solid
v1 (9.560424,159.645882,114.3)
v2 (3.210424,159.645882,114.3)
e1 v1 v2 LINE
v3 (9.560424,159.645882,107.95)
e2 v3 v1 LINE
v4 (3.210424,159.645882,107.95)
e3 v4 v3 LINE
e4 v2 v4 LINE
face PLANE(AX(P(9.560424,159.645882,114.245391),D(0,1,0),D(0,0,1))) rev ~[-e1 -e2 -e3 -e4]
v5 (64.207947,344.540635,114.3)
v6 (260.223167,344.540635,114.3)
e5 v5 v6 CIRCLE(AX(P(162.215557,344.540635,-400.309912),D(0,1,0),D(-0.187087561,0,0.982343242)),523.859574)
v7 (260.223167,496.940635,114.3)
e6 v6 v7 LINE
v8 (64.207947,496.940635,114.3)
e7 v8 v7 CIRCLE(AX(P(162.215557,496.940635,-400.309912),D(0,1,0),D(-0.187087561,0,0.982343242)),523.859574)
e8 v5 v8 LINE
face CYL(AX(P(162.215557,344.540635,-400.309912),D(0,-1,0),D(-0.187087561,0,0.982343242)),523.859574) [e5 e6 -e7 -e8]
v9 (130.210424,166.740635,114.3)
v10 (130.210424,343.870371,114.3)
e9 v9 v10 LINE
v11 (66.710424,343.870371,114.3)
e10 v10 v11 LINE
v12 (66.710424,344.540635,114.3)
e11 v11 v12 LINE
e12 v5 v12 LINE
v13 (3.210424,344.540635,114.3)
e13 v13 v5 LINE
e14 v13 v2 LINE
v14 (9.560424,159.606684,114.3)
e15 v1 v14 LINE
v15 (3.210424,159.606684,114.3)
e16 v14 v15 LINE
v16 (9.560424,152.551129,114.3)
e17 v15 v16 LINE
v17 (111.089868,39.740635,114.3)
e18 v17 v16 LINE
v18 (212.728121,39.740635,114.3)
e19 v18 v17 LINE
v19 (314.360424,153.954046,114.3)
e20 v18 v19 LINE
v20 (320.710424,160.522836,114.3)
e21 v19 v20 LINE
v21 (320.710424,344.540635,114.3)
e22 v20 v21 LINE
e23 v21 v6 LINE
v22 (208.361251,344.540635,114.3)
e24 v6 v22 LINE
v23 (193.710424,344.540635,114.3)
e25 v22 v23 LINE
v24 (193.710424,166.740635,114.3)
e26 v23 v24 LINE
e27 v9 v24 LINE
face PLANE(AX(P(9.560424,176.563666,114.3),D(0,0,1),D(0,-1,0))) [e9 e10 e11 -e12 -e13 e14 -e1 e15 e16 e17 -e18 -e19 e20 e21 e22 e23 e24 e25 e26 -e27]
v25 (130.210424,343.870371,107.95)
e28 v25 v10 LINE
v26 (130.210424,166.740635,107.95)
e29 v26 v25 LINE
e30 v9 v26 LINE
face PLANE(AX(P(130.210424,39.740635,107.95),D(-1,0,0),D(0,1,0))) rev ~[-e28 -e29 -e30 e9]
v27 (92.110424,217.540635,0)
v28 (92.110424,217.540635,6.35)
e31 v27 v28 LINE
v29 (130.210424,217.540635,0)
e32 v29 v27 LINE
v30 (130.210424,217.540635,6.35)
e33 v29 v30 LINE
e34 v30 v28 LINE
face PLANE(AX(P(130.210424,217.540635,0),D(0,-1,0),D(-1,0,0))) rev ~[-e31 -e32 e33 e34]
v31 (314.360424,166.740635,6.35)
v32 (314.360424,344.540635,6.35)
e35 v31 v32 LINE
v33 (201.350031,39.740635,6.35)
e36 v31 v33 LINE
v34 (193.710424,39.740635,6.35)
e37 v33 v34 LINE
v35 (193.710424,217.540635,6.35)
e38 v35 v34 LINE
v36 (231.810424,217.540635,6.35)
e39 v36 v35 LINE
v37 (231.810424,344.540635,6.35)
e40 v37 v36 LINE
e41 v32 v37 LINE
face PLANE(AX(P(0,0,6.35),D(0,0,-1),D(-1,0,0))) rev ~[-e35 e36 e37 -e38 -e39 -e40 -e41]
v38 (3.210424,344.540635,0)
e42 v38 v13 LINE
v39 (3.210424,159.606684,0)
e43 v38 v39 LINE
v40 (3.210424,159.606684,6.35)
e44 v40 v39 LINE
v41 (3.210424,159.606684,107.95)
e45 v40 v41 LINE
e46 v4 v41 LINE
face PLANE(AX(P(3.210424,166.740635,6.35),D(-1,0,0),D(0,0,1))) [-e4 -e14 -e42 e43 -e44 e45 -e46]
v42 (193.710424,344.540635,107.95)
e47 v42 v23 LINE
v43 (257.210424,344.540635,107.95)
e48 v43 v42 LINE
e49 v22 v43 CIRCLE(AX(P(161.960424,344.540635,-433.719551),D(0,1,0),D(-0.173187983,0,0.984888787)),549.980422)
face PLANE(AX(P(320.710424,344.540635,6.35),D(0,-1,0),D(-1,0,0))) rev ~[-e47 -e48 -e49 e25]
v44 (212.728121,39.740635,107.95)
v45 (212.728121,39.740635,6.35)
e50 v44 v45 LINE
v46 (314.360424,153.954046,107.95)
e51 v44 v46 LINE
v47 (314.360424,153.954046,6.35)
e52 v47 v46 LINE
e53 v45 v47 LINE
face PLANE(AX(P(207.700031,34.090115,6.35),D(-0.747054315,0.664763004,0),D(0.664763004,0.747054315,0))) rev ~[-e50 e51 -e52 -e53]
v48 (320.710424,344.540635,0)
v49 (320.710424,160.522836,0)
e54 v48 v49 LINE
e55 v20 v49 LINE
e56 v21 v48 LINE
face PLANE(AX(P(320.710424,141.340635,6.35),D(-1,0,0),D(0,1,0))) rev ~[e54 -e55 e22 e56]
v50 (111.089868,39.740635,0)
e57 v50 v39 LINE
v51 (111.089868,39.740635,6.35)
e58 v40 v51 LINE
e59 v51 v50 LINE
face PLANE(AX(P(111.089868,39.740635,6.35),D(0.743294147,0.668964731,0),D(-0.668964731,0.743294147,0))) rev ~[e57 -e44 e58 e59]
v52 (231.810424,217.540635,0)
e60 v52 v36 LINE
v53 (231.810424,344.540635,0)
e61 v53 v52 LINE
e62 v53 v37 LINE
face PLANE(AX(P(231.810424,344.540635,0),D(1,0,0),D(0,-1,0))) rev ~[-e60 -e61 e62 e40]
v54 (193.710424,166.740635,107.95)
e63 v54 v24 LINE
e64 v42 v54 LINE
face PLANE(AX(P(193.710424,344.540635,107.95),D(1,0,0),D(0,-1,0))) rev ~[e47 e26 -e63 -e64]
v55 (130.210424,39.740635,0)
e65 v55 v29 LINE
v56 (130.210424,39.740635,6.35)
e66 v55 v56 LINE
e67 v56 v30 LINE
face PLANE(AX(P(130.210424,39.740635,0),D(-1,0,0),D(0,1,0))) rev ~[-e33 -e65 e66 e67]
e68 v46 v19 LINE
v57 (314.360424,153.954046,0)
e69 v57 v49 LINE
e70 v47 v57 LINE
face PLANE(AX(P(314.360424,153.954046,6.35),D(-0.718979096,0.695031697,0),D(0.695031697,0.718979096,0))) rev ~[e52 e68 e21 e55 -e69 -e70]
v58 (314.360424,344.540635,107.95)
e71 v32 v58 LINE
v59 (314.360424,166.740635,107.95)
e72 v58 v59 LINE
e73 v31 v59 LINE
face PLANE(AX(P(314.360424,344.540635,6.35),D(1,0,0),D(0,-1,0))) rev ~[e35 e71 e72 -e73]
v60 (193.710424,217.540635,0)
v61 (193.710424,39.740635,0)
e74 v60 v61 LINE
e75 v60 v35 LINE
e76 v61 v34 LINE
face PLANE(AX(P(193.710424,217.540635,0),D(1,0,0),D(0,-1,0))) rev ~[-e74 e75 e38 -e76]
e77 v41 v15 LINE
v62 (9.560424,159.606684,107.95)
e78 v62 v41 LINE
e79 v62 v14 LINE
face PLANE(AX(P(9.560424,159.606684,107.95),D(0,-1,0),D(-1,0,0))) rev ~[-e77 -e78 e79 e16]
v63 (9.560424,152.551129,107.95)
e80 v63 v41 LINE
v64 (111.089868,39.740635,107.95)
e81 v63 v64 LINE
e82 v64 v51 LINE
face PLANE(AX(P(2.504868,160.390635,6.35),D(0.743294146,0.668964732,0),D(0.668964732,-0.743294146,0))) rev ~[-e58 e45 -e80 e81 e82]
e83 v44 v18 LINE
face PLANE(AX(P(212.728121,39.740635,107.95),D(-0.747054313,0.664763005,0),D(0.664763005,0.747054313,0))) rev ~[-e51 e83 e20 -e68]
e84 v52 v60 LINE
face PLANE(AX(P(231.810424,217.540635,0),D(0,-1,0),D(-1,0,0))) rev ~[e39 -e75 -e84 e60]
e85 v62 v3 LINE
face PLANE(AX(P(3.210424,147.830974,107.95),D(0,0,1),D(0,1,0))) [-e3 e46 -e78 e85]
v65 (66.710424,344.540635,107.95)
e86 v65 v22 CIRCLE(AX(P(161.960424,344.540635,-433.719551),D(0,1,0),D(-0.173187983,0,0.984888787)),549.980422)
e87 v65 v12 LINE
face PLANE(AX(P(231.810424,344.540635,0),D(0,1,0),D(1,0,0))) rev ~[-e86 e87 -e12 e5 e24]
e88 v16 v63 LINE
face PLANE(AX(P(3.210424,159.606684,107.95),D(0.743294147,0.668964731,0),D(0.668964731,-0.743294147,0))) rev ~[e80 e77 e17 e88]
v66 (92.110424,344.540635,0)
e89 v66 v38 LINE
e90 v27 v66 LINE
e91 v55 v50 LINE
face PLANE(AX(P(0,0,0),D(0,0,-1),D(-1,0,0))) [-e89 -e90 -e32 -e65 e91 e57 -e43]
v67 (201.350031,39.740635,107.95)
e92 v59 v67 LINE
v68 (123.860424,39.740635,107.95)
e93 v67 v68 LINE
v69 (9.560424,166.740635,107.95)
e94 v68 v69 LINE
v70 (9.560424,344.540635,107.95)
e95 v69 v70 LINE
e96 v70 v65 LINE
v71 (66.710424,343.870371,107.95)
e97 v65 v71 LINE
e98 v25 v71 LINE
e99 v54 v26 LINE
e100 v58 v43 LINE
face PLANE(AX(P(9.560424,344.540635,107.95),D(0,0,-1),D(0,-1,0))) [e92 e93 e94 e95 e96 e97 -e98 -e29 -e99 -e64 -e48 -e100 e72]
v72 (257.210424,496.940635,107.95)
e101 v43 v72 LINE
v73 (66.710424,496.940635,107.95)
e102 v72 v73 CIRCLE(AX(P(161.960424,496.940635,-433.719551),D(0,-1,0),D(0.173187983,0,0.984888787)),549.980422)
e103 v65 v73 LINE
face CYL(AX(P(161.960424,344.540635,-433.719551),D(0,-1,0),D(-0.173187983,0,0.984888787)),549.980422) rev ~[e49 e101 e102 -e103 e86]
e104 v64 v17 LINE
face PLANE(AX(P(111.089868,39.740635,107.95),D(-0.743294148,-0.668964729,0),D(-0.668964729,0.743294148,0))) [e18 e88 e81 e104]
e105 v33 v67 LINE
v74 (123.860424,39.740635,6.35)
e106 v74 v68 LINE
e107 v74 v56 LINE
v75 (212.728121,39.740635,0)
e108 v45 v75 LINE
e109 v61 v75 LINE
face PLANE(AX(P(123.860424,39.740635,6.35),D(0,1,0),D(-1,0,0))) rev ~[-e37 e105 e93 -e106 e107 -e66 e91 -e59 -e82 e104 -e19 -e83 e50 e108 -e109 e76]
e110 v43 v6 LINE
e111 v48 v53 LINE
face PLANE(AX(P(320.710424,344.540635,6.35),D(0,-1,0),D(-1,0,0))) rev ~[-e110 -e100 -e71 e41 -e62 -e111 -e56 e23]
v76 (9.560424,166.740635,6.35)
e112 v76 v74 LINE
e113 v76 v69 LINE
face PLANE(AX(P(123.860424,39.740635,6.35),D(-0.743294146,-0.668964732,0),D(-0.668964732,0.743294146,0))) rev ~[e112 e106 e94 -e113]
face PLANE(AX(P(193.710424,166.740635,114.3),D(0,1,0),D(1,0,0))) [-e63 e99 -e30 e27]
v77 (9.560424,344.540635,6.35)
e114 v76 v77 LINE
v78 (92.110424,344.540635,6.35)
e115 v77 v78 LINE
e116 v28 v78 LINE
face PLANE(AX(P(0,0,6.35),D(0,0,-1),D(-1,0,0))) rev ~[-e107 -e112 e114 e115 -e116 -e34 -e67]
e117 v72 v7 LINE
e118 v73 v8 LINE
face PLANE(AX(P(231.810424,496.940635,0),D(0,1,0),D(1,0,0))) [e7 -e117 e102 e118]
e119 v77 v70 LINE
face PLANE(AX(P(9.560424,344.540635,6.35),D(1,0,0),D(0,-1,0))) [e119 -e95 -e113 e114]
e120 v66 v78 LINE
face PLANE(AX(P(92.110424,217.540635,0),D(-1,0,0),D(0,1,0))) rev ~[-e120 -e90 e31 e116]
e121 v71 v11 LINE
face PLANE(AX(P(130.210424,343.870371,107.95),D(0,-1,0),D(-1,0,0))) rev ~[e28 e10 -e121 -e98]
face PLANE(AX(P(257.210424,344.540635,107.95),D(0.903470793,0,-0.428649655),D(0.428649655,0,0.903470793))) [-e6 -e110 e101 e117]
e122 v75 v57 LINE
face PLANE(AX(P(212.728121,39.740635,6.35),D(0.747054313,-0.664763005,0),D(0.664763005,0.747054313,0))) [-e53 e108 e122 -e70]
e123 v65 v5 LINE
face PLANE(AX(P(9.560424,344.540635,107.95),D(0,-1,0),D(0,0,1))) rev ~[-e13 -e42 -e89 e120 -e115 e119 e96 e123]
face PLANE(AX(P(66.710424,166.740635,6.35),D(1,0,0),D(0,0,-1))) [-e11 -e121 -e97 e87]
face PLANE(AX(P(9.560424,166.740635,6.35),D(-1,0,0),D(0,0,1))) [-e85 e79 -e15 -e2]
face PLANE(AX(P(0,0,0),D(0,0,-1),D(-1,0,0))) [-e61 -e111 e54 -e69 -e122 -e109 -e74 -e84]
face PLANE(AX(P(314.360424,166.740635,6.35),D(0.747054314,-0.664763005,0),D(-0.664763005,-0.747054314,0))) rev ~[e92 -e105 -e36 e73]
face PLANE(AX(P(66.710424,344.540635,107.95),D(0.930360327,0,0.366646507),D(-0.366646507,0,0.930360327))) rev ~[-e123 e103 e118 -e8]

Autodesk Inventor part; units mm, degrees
ref_plane "YZ Plane" through (0, 0, 0) normal (1, 0, 0) x (0, 1, 0)
ref_plane "XZ Plane" through (0, 0, 0) normal (0, 1, 0) x (-1, 0, 0)
ref_plane "XY Plane" through (0, 0, 0) normal (0, 0, 1) x (1, 0, 0)
sketch "Sketch1" plane through (0, 0, 0) normal (0, 0, 1) x (1, 0, 0)
  line L0 (9.560424, 344.540635) -> (9.560424, 166.740635)
  line L1 (9.560424, 166.740635) -> (123.860424, 39.740635)
  line L2 (123.860424, 39.740635) -> (130.210424, 39.740635)
  line L3 (130.210424, 39.740635) -> (130.210424, 217.540635)
  line L4 (130.210424, 217.540635) -> (92.110424, 217.540635)
  line L5 (92.110424, 217.540635) -> (92.110424, 344.540635)
  line L6 (92.110424, 344.540635) -> (9.560424, 344.540635)
  line L7 (193.710424, 217.540635) -> (193.710424, 39.740635)
  line L8 (193.710424, 39.740635) -> (200.060424, 39.740635)
  line L9 (200.060424, 39.740635) -> (314.360424, 166.740635)
  line L10 (314.360424, 166.740635) -> (314.360424, 344.540635)
  line L11 (314.360424, 344.540635) -> (231.810424, 344.540635)
  line L12 (231.810424, 344.540635) -> (231.810424, 217.540635)
  line L13 (231.810424, 217.540635) -> (193.710424, 217.540635)
  point P0 (0, 0)
  dimension "d0" = 127
  dimension "d1" = 38.1
  dimension "d2" = 177.8
  dimension "d3" = 127
  dimension "d4" = 82.55
  dimension "d5" = 6.35
  dimension "d9" = 63.5
  dimension "d10" = 38.1
  dimension "d11" = 82.55
  dimension "d12" = 6.35
  dimension "d13" = 177.8
  dimension "d14" = 170.86103
  dimension "d15" = 127
  dimension "d16" = 177.8
extrude "Extrusion1" add sketch "Sketch1" along normal blind 6.35
sketch "Sketch2" plane through (0, 0, 6.35) normal (0, 0, 1) x (1, 0, 0)
  line L0 (9.560424, 166.740635) -> (123.860424, 39.740635)
  line L1 (9.560424, 166.740635) -> (123.860424, 39.740635)
  line L2 (123.860424, 39.740635) -> (116.804868, 33.390635)
  line L3 (116.804868, 33.390635) -> (2.504868, 160.390635)
  line L4 (2.504868, 160.390635) -> (9.560424, 166.740635)
  line L5 (314.360424, 166.740635) -> (201.350031, 39.740635)
  line L6 (201.350031, 39.740635) -> (207.700031, 34.090115)
  line L7 (207.700031, 34.090115) -> (320.710424, 161.090115)
  line L8 (320.710424, 161.090115) -> (314.360424, 166.740635)
  line L9 (9.560424, 166.740635) -> (3.210424, 166.740635)
  line L10 (3.210424, 166.740635) -> (3.210424, 369.270371)
  line L11 (3.210424, 369.270371) -> (9.560424, 369.270371)
  line L12 (9.560424, 369.270371) -> (9.560424, 166.740635)
  line L13 (314.360424, 166.740635) -> (314.360424, 344.540635)
  line L14 (314.360424, 344.540635) -> (320.710424, 344.540635)
  line L15 (320.710424, 344.540635) -> (320.710424, 141.340635)
  line L16 (320.710424, 141.340635) -> (314.360424, 141.340635)
  line L17 (314.360424, 141.340635) -> (314.360424, 344.540635)
  point P0 (0, 0)
  dimension "d17" = 6.35
  dimension "d18" = 6.35
  dimension "d19" = 6.35
  dimension "d20" = 6.35
sketch "Sketch2 outline for Extrusion2" plane through (0, 0, 6.35) normal (0, 0, 1) x (1, 0, 0)
  line L0 (3.210424, 166.740635) -> (9.560424, 166.740635)
  line L1 (3.210424, 369.270371) -> (3.210424, 166.740635)
  line L2 (9.560424, 369.270371) -> (3.210424, 369.270371)
  line L3 (9.560424, 166.740635) -> (9.560424, 369.270371)
  line L4 (320.710424, 344.540635) -> (314.360424, 344.540635)
  line L5 (314.360424, 344.540635) -> (314.360424, 166.740635)
  line L6 (314.360424, 166.740635) -> (201.350031, 39.740635)
  line L7 (201.350031, 39.740635) -> (207.700031, 34.090115)
  line L8 (207.700031, 34.090115) -> (314.360424, 153.954046)
  line L9 (314.360424, 153.954046) -> (314.360424, 141.340635)
  line L10 (314.360424, 141.340635) -> (320.710424, 141.340635)
  line L11 (320.710424, 141.340635) -> (320.710424, 344.540635)
  line L12 (123.860424, 39.740635) -> (9.560424, 166.740635)
  line L13 (116.804868, 33.390635) -> (123.860424, 39.740635)
  line L14 (2.504868, 160.390635) -> (116.804868, 33.390635)
  line L15 (9.560424, 166.740635) -> (2.504868, 160.390635)
extrude "Extrusion2" add sketch "Sketch2 outline for Extrusion2" along normal blind 101.6
sketch "Sketch4" plane through (0, 0, 0) normal (0, 0, -1) x (-1, 0, 0)
  line L0 (-193.710424, 39.740635) -> (-200.060424, 39.740635)
  line L1 (-193.710424, 39.740635) -> (-216.217025, 39.740635)
  line L2 (-216.217025, 39.740635) -> (-216.217025, 32.649574)
  line L3 (-216.217025, 32.649574) -> (-193.710424, 32.649574)
  line L4 (-193.710424, 32.649574) -> (-193.710424, 39.740635)
  line L5 (-123.860424, 39.740635) -> (-130.210424, 39.740635)
  line L6 (-130.210424, 39.740635) -> (-108.923155, 39.740635)
  line L7 (-108.923155, 39.740635) -> (-108.923155, 31.510409)
  line L8 (-108.923155, 31.510409) -> (-130.210424, 31.510409)
  line L9 (-130.210424, 31.510409) -> (-130.210424, 39.740635)
  point P0 (0, 0)
  point P1 (-200.060424, 14.340635)
  point P2 (-123.860424, 14.340635)
extrude "Extrusion4" cut sketch "Sketch4" against normal blind 114.3
sketch "Sketch5" plane through (0, 0, 107.95) normal (0, 0, 1) x (1, 0, 0)
  line L0 (3.210424, 141.340635) -> (3.210424, 343.870371)
  line L1 (3.210424, 343.870371) -> (130.210424, 343.870371)
  line L2 (92.110424, 344.540635) -> (9.560424, 344.540635)
  line L3 (130.210424, 39.740635) -> (130.210424, 217.540635)
  line L4 (130.210424, 343.870371) -> (130.210424, 39.740635)
  line L5 (123.860424, 39.740635) -> (130.210424, 39.740635)
  line L6 (130.210424, 14.340635) -> (111.089868, 14.340635)
  line L7 (111.089868, 14.340635) -> (2.504868, 134.990635)
  line L8 (111.089868, 14.340635) -> (2.504868, 134.990635)
  line L9 (2.504868, 134.990635) -> (3.210424, 141.340635)
  line L10 (193.710424, 39.740635) -> (193.710424, 344.540635)
  line L11 (193.710424, 344.540635) -> (320.710424, 344.540635)
  line L12 (320.710424, 141.340635) -> (320.710424, 344.540635)
  line L13 (320.710424, 344.540635) -> (320.710424, 141.340635)
  line L14 (314.360424, 344.540635) -> (314.360424, 141.340635)
  line L15 (320.710424, 135.690115) -> (314.360424, 141.340635)
  line L16 (320.710424, 141.340635) -> (320.710424, 135.690115)
  line L17 (320.710424, 135.690115) -> (235.3302, 39.740635)
  line L18 (235.3302, 39.740635) -> (193.710424, 39.740635)
  point P0 (0, 0)
sketch "Sketch5 outline for Extrusion5" plane through (0, 0, 107.95) normal (0, 0, 1) x (1, 0, 0)
  line L0 (193.710424, 344.540635) -> (193.710424, 39.740635)
  line L1 (193.710424, 39.740635) -> (235.3302, 39.740635)
  line L2 (235.3302, 39.740635) -> (320.710424, 135.690115)
  line L3 (320.710424, 135.690115) -> (320.710424, 344.540635)
  line L4 (320.710424, 344.540635) -> (193.710424, 344.540635)
  line L5 (3.210424, 343.870371) -> (3.210424, 141.340635)
  line L6 (130.210424, 343.870371) -> (3.210424, 343.870371)
  line L7 (130.210424, 39.740635) -> (130.210424, 343.870371)
  line L8 (111.089868, 14.340635) -> (130.210424, 39.740635)
  line L9 (2.504868, 134.990635) -> (111.089868, 14.340635)
  line L10 (3.210424, 141.340635) -> (2.504868, 134.990635)
extrude "Extrusion5" add sketch "Sketch5 outline for Extrusion5" along normal blind 6.35
sketch "Sketch6" plane through (193.710424, 39.740635, 107.95) normal (-1, 0, 0) x (0, 0, 1)
  line L0 (0, 304.8) -> (0, 0) projected
  line L1 (6.35, 0) -> (-101.6, 0) projected
  line L2 (0, 101.6) -> (6.35, 101.6)
  line L3 (6.35, 101.6) -> (6.35, 0)
  line L4 (6.35, 0) -> (0, 0)
  line L5 (0, 0) -> (0, 101.6)
  point P0 (-107.95, -39.740635)
  point P1 (-107.95, 0)
  dimension "d29" = 101.6
extrude "Extrusion6" add sketch "Sketch6" along normal blind 63.5
sketch "Sketch7" plane through (0, 0, 0) normal (0, 0, -1) x (-1, 0, 0)
  line L0 (-3.210424, 343.870371) -> (-3.210424, 141.340635)
  line L1 (-3.210424, 147.802494) -> (-9.560424, 147.802494)
  line L2 (-9.560424, 147.802494) -> (-9.560424, 134.679374)
  line L3 (-9.560424, 134.679374) -> (-3.210424, 134.679374)
  line L4 (-3.210424, 134.679374) -> (-3.210424, 147.802494)
  line L5 (-314.360424, 166.740635) -> (-201.350031, 39.740635)
  line L6 (-320.714268, 135.664797) -> (-320.714268, 145.552556)
  line L7 (-320.738877, 135.664797) -> (-314.360424, 135.664797)
  line L8 (-314.360424, 135.664797) -> (-314.360424, 145.552556)
  line L9 (-314.360424, 166.740635) -> (-314.360424, 344.540635)
  line L10 (-320.714268, 145.552556) -> (-314.360424, 145.552556)
  line L11 (-320.738877, 135.664797) -> (-314.360424, 135.664797)
  line L12 (-314.360424, 135.664797) -> (-314.360424, 145.552556)
  line L13 (-314.360424, 145.552556) -> (-320.738877, 145.552556)
  line L14 (-320.738877, 145.552556) -> (-320.738877, 135.664797)
  point P0 (0, 0)
  point P1 (-309.309804, 161.064797)
  point P2 (-314.360424, 141.340635)
  point P3 (-201.350031, 39.740635)
sketch "Sketch8" plane through (0, 0, 0) normal (0, 0, -1) x (-1, 0, 0)
  line L0 (-3.210424, 141.340635) -> (-3.210424, 343.870371)
  line L1 (-3.210424, 141.825243) -> (-1.362602, 141.825243)
  line L2 (-1.362602, 141.825243) -> (-1.362602, 134.146464)
  line L3 (-1.362602, 134.146464) -> (-3.210424, 134.146464)
  line L4 (-3.210424, 134.146464) -> (-3.210424, 141.825243)
  point P0 (0, 0)
  point P1 (-3.210424, 135.625635)
extrude "Extrusion8" cut sketch "Sketch8" against normal blind 114.3
sketch "Sketch10" plane through (231.810424, 344.540635, 0) normal (0, 1, 0) x (1, 0, 0)
  line L0 (88.9, -114.3) -> (-38.1, -114.3)
  line L1 (-101.6, -114.3) -> (-228.6, -114.3)
  line L2 (-101.6, -107.95) -> (-222.25, -107.95)
  line L3 (82.55, -107.95) -> (-30.460392, -107.95)
  arc A0 (-165.1, -107.95) -> (25.4, -107.95) centre (-69.85, 433.719551) ccw
  line L4 (88.9, -6.35) -> (88.9, -114.3)
  line L5 (-228.6, -107.95) -> (-228.6, -114.3)
  line L6 (-165.1, -107.95) -> (-167.602477, -114.3)
  line L7 (25.4, -107.95) -> (28.412743, -114.3)
  line L8 (3.519776, -114.3) -> (88.9, -114.3)
  arc A1 (-167.602477, -114.3) -> (28.412743, -114.3) centre (-69.594867, 400.309912) ccw
  point P0 (-231.810424, 0)
  point P1 (-165.1, -114.3)
  point P2 (25.4, -114.3)
  point P3 (77.518866, -107.95)
  point P4 (88.9, 0)
  point P5 (-228.6, 0)
  point P6 (88.896956, -114.3)
  dimension "d38" = 190.5
  dimension "d39" = 63.5
  dimension "d40" = 63.5
  dimension "d44" = 63.5
  dimension "d45" = 63.5
extrude "Extrusion10" add sketch "Sketch10" along normal blind 152.4
extrude "Extrusion11" add sketch "Sketch7" against normal blind 114.3
sketch "Sketch11" plane through (193.710424, 141.340635, 114.3) normal (0, 1, 0) x (1, 0, 0)
  line L0 (0, 6.35) -> (0, 0)
  line L1 (-63.505152, 0) -> (0, 0)
  line L2 (0, 0) -> (0, 6.35)
  line L3 (0, 6.35) -> (-63.505152, 6.35)
  line L4 (-63.505152, 6.35) -> (-63.505152, 0)
  line L5 (0, 0) -> (-63.5, 0)
  point P0 (-193.710424, 114.3)
extrude "Extrusion12" add sketch "Sketch11" along normal blind 25.4
sketch "Sketch12" plane through (0, 0, 107.95) normal (0, 0, 1) x (1, 0, 0)
  line L0 (130.210424, 343.870371) -> (9.560424, 343.870371)
  line L1 (3.210424, 369.270371) -> (3.210424, 166.740635)
  line L2 (9.560424, 343.870371) -> (3.210424, 343.870371)
  line L3 (3.210424, 343.870371) -> (3.210424, 369.270371)
  line L4 (3.210424, 369.270371) -> (9.560424, 369.270371)
  line L5 (9.560424, 369.270371) -> (9.560424, 343.870371)
  point P0 (0, 0)
extrude "Extrusion13" cut sketch "Sketch12" against normal blind 114.3
sketch "Sketch13" plane through (3.210424, 166.740635, 6.35) normal (-1, 0, 0) x (0, 0, 1)
  line L0 (107.95, -32.533951) -> (107.95, -152.4)
  line L1 (-6.35, -18.909661) -> (107.95, -18.909661)
  line L2 (107.95, -18.909661) -> (107.95, -32.533951)
  line L3 (107.95, -32.533951) -> (-6.35, -32.533951)
  line L4 (-6.35, -32.533951) -> (-6.35, -18.909661)
  line L5 (101.6, -127) -> (101.6, 0)
  line L6 (101.6, 0) -> (107.95, 0)
  line L7 (107.95, 0) -> (107.95, -18.909661)
  line L8 (107.95, -18.909661) -> (101.6, -18.909661)
  line L9 (101.6, -18.909661) -> (101.6, 0)
  point P0 (-6.35, -166.740635)
extrude "Extrusion14" cut sketch "Sketch13" against normal blind 6.35
sketch "Sketch14" plane through (0, 0, 107.95) normal (0, 0, -1) x (-1, 0, 0)
  line L0 (-9.560424, 152.551129) -> (-9.560424, 166.740635)
  line L1 (-9.560424, 134.206684) -> (-3.210424, 134.206684)
  line L2 (-9.560424, 152.551129) -> (-9.560424, 134.206684)
  line L3 (-9.560424, 134.206684) -> (-3.210424, 134.206684)
  line L4 (-3.210424, 134.206684) -> (-111.089868, 14.340635)
  line L5 (-3.210424, 134.206684) -> (-111.089868, 14.340635)
  line L6 (-111.089868, 14.340635) -> (-130.210424, 39.740635)
  line L7 (-111.089868, 14.340635) -> (-130.210424, 39.740635)
  line L8 (-111.089868, 39.740635) -> (-123.860424, 39.740635)
  line L9 (-130.210424, 39.740635) -> (-111.089868, 39.740635)
  line L10 (-111.089868, 39.740635) -> (-9.560424, 152.551129)
  point P0 (0, 0)
extrude "Extrusion15" cut sketch "Sketch14" against normal blind 6.35
sketch "Sketch16" plane through (0, 0, 107.95) normal (0, 0, -1) x (-1, 0, 0)
  line L0 (-314.360424, 153.954046) -> (-314.360424, 145.552556)
  line L1 (-314.360424, 135.664797) -> (-314.360424, 145.552556)
  line L2 (-314.360424, 153.954046) -> (-314.360424, 135.664797)
  line L3 (-320.738877, 135.664797) -> (-314.360424, 135.664797)
  line L4 (-314.360424, 135.664797) -> (-320.738877, 135.664797)
  line L5 (-235.3302, 39.740635) -> (-320.687894, 135.664797)
  line L6 (-320.738877, 135.664797) -> (-235.381183, 39.740635)
  line L7 (-212.728121, 39.740635) -> (-314.360424, 153.954046)
  line L8 (-235.381183, 39.740635) -> (-212.728121, 39.740635)
  line L9 (-212.728121, 39.740635) -> (-314.360424, 153.954046)
  point P0 (0, 0)
extrude "Extrusion16" cut sketch "Sketch16" against normal blind 6.35
sketch "Sketch17" plane through (0, 0, 6.35) normal (0, 0, -1) x (-1, 0, 0)
  line L0 (-212.728121, 39.740635) -> (-314.360424, 153.954046)
  line L1 (-314.360424, 153.954046) -> (-320.710424, 160.522836)
  line L2 (-320.710424, 145.552556) -> (-320.710424, 344.540635)
  line L3 (-320.710424, 145.552556) -> (-314.360424, 145.552556)
  line L4 (-320.710424, 145.552556) -> (-314.360424, 145.552556)
  line L5 (-314.360424, 145.552556) -> (-314.360424, 153.954046)
  line L6 (-314.360424, 153.954046) -> (-314.360424, 135.664797)
  line L7 (-314.360424, 145.552556) -> (-320.710424, 145.552556)
  line L8 (-320.710424, 145.552556) -> (-320.710424, 153.954046)
  line L9 (-320.710424, 153.954046) -> (-314.360424, 153.954046)
  line L10 (-314.360424, 153.954046) -> (-314.360424, 145.552556)
  line L11 (-320.710424, 160.522836) -> (-314.360424, 153.954046)
  line L12 (-320.710424, 160.522836) -> (-320.710424, 153.954046)
  point P0 (0, 0)
extrude "Extrusion17" cut sketch "Sketch17" against normal blind 152.4
sketch "Sketch18" plane through (0, 0, 0) normal (0, 0, -1) x (-1, 0, 0)
  line L0 (-314.360424, 145.552556) -> (-320.738877, 145.552556)
  line L1 (-320.738877, 145.552556) -> (-314.360424, 145.552556)
  line L2 (-314.360424, 145.552556) -> (-314.360424, 135.51)
  line L3 (-314.360424, 135.51) -> (-320.738877, 135.51)
  line L4 (-320.738877, 135.51) -> (-320.738877, 145.552556)
  point P0 (0, 0)
extrude "Extrusion18" cut sketch "Sketch18" against normal blind 152.4
sketch "Sketch19" plane through (0, 0, 6.35) normal (0, 0, -1) x (-1, 0, 0)
  line L0 (-111.089868, 39.740635) -> (-212.728121, 39.740635)
  line L1 (-124.141437, 39.740635) -> (-111.089868, 39.740635)
  line L2 (-9.560424, 343.870371) -> (-9.560424, 166.740635)
  line L3 (-9.560424, 343.870371) -> (-3.073851, 343.870371)
  line L4 (-3.073851, 343.870371) -> (-3.073851, 166.740635)
  line L5 (-3.073851, 166.740635) -> (-9.560424, 166.740635)
  line L6 (-9.560424, 166.740635) -> (-9.560424, 343.870371)
  line L7 (-314.360424, 166.740635) -> (-314.360424, 344.540635)
  line L8 (-314.360424, 153.954046) -> (-320.710424, 160.522836)
  line L9 (-314.360424, 344.540635) -> (-320.710424, 344.540635)
  line L10 (-320.710424, 344.540635) -> (-320.710424, 160.522836)
  line L11 (-320.710424, 160.522836) -> (-314.360424, 160.522836)
  line L12 (-314.360424, 160.522836) -> (-314.360424, 344.540635)
  line L13 (-200.060424, 39.740635) -> (-314.360424, 166.740635)
  line L14 (-314.360424, 166.740635) -> (-314.360424, 160.522836)
  line L15 (-314.360424, 160.522836) -> (-320.710424, 160.522836)
  line L16 (-212.728121, 39.740635) -> (-314.360424, 153.954046)
  line L17 (-320.710424, 160.522836) -> (-320.710424, 344.540635)
  line L18 (-320.710424, 160.522836) -> (-212.728121, 39.740635)
  line L19 (-212.728121, 39.740635) -> (-200.060424, 39.740635)
  line L20 (-200.060424, 39.740635) -> (-314.360424, 166.740635)
  point P0 (0, 0)
extrude "Extrusion19" add sketch "Sketch19" along normal blind 6.35 contours L0 L16 L8 L11 L12 L13 | L12 L11 L10 L9 L7
sketch "Sketch20" plane through (0, 0, 6.35) normal (0, 0, -1) x (-1, 0, 0)
  line L0 (-9.560424, 166.740635) -> (-2.504868, 160.390635)
  line L1 (-9.560424, 160.390635) -> (-9.560424, 175.559995)
  line L2 (-3.210424, 343.870371) -> (-3.210424, 166.740635)
  line L3 (-9.560424, 166.740635) -> (-9.560424, 152.551129)
  line L4 (-3.210424, 176.563666) -> (-9.560424, 176.563666)
  line L5 (-9.560424, 176.563666) -> (-9.560424, 159.645882)
  line L6 (-9.560424, 159.645882) -> (-3.210424, 159.645882)
  line L7 (-3.210424, 159.645882) -> (-3.210424, 176.563666)
  point P0 (0, 0)
extrude "Extrusion20" add sketch "Sketch20" against normal blind 152.4
sketch "Sketch21" plane through (0, 0, 6.35) normal (0, 0, -1) x (-1, 0, 0)
  line L0 (-3.210424, 161.025635) -> (-2.504868, 160.390635)
  line L1 (-3.210424, 161.025635) -> (-2.32353, 161.025635)
  line L2 (-2.32353, 161.025635) -> (-2.32353, 159.41775)
  line L3 (-2.32353, 159.41775) -> (-3.210424, 159.41775)
  line L4 (-3.210424, 159.41775) -> (-3.210424, 161.025635)
  point P0 (0, 0)
extrude "Extrusion21" cut sketch "Sketch21" against normal blind 152.4
sketch "Sketch22" plane through (3.210424, 176.563666, 114.3) normal (0, 1, 0) x (1, 0, 0)
  line L0 (0, 6.35) -> (0, -44.45)
  line L1 (0, -44.45) -> (6.35, -44.45)
  line L2 (0, 0.054609) -> (6.35, 0.054609)
  line L3 (6.35, 0.054609) -> (6.35, -44.45)
  line L4 (6.35, -44.45) -> (0, -44.45)
  line L5 (0, -44.45) -> (0, 0.054609)
  point P0 (-3.210424, 114.3)
extrude "Extrusion22" cut sketch "Sketch22" against normal blind 25.4
sketch "Sketch23" plane through (0, 0, 107.95) normal (0, 0, 1) x (1, 0, 0)
  line L0 (3.176222, 159.644687) -> (9.515247, 152.601326)
  line L1 (3.210424, 159.606684) -> (111.089868, 39.740635)
  line L2 (9.560424, 159.645882) -> (3.210424, 159.645882)
  line L3 (9.560424, 159.645882) -> (3.175146, 159.645882)
  line L4 (3.175146, 159.645882) -> (9.560424, 159.606684)
  line L5 (9.560424, 152.551129) -> (9.560424, 159.645882)
  line L6 (9.560424, 159.606684) -> (9.560424, 152.551129)
  line L7 (9.560424, 152.551129) -> (3.210424, 159.606684)
  line L8 (9.560424, 159.606684) -> (3.210424, 159.606684)
  line L9 (3.210424, 159.606684) -> (3.210424, 152.551129)
  line L10 (3.210424, 152.551129) -> (9.560424, 152.551129)
  line L11 (9.560424, 152.551129) -> (9.560424, 159.606684)
  point P0 (0, 0)
extrude "Extrusion23" add sketch "Sketch23" along normal blind 6.35 contours L8 L5 L1 L0 | L0 L1 L10 L9
sketch "Sketch24" plane through (3.210424, 176.563666, 114.245391) normal (0, 0, 1) x (1, 0, 0)
  line L0 (6.35, 0) -> (6.35, -16.917784)
  line L1 (0, 0) -> (6.35, 0)
  line L2 (6.35, 0) -> (6.35, -16.917784)
  line L3 (6.35, -16.917784) -> (0, -16.917784)
  line L4 (0, -16.917784) -> (0, 0)
  point P0 (-3.210424, -176.563666)
sketch "Sketch25" plane through (0, 0, 107.95) normal (0, 0, -1) x (-1, 0, 0)
  line L0 (-3.210424, 159.606684) -> (-111.089868, 39.740635)
  line L1 (-3.210424, 159.606684) -> (-9.560424, 152.551129)
  line L2 (-3.210424, 152.551129) -> (-9.560424, 152.551129)
  line L3 (-3.210424, 152.551129) -> (-3.210424, 159.606684)
  line L4 (-3.210424, 159.606684) -> (-3.210424, 152.551129)
  line L5 (-9.560424, 152.551129) -> (-3.210424, 152.551129)
  line L6 (-9.560424, 159.645882) -> (-3.210424, 159.645882)
  line L7 (-3.210424, 159.645882) -> (-9.560424, 152.551129)
  point P0 (0, 0)
extrude "Extrusion24" cut sketch "Sketch25" against normal blind 25.4
sketch "Sketch26" plane through (0, 0, 6.35) normal (0, 0, -1) x (-1, 0, 0)
  line L0 (-123.860424, 39.740635) -> (-9.560424, 166.740635)
  line L1 (-111.089868, 39.740635) -> (-212.728121, 39.740635)
  line L2 (-123.860424, 39.740635) -> (-111.089868, 39.740635)
  line L3 (-3.210424, 159.606684) -> (-111.089868, 39.740635)
  line L4 (-111.089868, 39.740635) -> (-3.210424, 159.606684)
  line L5 (-3.210424, 159.606684) -> (-3.210424, 343.870371)
  line L6 (-3.210424, 159.606684) -> (-3.210424, 343.870371)
  line L7 (-3.210424, 343.870371) -> (-9.560424, 343.870371)
  line L8 (-130.210424, 343.870371) -> (-3.210424, 343.870371)
  line L9 (-9.560424, 344.540635) -> (-9.560424, 166.740635)
  line L10 (-9.560424, 166.740635) -> (-9.560424, 344.540635)
  line L11 (-3.210424, 159.606684) -> (-9.560424, 166.740635)
  line L12 (-9.560424, 166.740635) -> (-3.210424, 166.740635)
  point P0 (0, 0)
sketch "Sketch26 outline for Extrusion25" plane through (0, 0, 6.35) normal (0, 0, -1) x (-1, 0, 0)
  line L0 (-9.560424, 166.740635) -> (-123.860424, 39.740635)
  line L1 (-123.860424, 39.740635) -> (-111.089868, 39.740635)
  line L2 (-111.089868, 39.740635) -> (-3.210424, 159.606684)
  line L3 (-3.210424, 159.606684) -> (-3.210424, 166.740635)
  line L4 (-3.210424, 166.740635) -> (-9.560424, 166.740635)
extrude "Extrusion25" add sketch "Sketch26 outline for Extrusion25" along normal blind 6.35
sketch "Sketch27" plane through (0, 0, 6.35) normal (0, 0, -1) x (-1, 0, 0)
  line L0 (-3.210424, 159.606684) -> (-3.210424, 166.740635)
  line L1 (-9.560424, 344.540635) -> (-9.560424, 166.740635)
  line L2 (-3.210424, 166.740635) -> (-9.560424, 166.740635)
  line L3 (-9.560424, 166.740635) -> (-9.560424, 344.540635)
  line L4 (-9.560424, 344.540635) -> (-3.210424, 344.540635)
  line L5 (-3.210424, 344.540635) -> (-3.210424, 166.740635)
  point P0 (0, 0)
extrude "Extrusion26" add sketch "Sketch27" along normal blind 6.35
sketch "Sketch28" plane through (0, 0, 6.35) normal (0, 0, 1) x (1, 0, 0)
  line L0 (92.110424, 344.540635) -> (3.210424, 344.540635)
  line L1 (9.560424, 343.870371) -> (3.210424, 343.870371)
  line L2 (3.210424, 343.870371) -> (3.210424, 344.540635)
  line L3 (3.210424, 344.540635) -> (9.560424, 344.540635)
  line L4 (9.560424, 344.540635) -> (9.560424, 343.870371)
  point P0 (0, 0)
extrude "Extrusion27" add sketch "Sketch28" along normal blind 107.95
sketch "Sketch29" plane through (9.560424, 166.740635, 6.35) normal (1, 0, 0) x (0, 0, -1)
  line L0 (-101.6, 0) -> (-101.6, 177.129736)
  line L1 (0, 177.8) -> (-107.95, 177.8)
  line L2 (-101.6, 177.129736) -> (-107.95, 177.129736)
  line L3 (-107.95, 177.129736) -> (-107.95, 177.8)
  line L4 (-107.95, 177.8) -> (-101.6, 177.8)
  line L5 (-101.6, 177.8) -> (-101.6, 177.129736)
  point P0 (6.35, -166.740635)
extrude "Extrusion28" add sketch "Sketch29" along normal blind 57.15
sketch "Sketch30" plane through (9.560424, 166.740635, 6.35) normal (-1, 0, 0) x (0, 0, 1)
  line L0 (101.6, -7.094753) -> (107.895391, -7.094753)
  line L1 (101.6, -7.133951) -> (107.95, -7.133951)
  line L2 (101.6, -7.094753) -> (107.95, -7.094753)
  line L3 (107.95, -7.094753) -> (107.95, -7.133951)
  line L4 (107.95, -7.133951) -> (101.6, -7.133951)
  line L5 (101.6, -7.133951) -> (101.6, -7.094753)
  line L6 (107.895391, 9.823031) -> (107.95, 9.823031)
  line L7 (107.95, -7.094753) -> (107.895391, -7.094753)
  line L8 (107.895391, -7.094753) -> (107.895391, 9.823031)
  line L9 (107.895391, 9.823031) -> (107.95, 9.823031)
  line L10 (107.95, 9.823031) -> (107.95, -7.094753)
  point P0 (-6.35, -166.740635)
extrude "Extrusion29" add sketch "Sketch30" along normal blind 6.35 contours L8 L6 L10 L2
properties part number "full gear cad"
